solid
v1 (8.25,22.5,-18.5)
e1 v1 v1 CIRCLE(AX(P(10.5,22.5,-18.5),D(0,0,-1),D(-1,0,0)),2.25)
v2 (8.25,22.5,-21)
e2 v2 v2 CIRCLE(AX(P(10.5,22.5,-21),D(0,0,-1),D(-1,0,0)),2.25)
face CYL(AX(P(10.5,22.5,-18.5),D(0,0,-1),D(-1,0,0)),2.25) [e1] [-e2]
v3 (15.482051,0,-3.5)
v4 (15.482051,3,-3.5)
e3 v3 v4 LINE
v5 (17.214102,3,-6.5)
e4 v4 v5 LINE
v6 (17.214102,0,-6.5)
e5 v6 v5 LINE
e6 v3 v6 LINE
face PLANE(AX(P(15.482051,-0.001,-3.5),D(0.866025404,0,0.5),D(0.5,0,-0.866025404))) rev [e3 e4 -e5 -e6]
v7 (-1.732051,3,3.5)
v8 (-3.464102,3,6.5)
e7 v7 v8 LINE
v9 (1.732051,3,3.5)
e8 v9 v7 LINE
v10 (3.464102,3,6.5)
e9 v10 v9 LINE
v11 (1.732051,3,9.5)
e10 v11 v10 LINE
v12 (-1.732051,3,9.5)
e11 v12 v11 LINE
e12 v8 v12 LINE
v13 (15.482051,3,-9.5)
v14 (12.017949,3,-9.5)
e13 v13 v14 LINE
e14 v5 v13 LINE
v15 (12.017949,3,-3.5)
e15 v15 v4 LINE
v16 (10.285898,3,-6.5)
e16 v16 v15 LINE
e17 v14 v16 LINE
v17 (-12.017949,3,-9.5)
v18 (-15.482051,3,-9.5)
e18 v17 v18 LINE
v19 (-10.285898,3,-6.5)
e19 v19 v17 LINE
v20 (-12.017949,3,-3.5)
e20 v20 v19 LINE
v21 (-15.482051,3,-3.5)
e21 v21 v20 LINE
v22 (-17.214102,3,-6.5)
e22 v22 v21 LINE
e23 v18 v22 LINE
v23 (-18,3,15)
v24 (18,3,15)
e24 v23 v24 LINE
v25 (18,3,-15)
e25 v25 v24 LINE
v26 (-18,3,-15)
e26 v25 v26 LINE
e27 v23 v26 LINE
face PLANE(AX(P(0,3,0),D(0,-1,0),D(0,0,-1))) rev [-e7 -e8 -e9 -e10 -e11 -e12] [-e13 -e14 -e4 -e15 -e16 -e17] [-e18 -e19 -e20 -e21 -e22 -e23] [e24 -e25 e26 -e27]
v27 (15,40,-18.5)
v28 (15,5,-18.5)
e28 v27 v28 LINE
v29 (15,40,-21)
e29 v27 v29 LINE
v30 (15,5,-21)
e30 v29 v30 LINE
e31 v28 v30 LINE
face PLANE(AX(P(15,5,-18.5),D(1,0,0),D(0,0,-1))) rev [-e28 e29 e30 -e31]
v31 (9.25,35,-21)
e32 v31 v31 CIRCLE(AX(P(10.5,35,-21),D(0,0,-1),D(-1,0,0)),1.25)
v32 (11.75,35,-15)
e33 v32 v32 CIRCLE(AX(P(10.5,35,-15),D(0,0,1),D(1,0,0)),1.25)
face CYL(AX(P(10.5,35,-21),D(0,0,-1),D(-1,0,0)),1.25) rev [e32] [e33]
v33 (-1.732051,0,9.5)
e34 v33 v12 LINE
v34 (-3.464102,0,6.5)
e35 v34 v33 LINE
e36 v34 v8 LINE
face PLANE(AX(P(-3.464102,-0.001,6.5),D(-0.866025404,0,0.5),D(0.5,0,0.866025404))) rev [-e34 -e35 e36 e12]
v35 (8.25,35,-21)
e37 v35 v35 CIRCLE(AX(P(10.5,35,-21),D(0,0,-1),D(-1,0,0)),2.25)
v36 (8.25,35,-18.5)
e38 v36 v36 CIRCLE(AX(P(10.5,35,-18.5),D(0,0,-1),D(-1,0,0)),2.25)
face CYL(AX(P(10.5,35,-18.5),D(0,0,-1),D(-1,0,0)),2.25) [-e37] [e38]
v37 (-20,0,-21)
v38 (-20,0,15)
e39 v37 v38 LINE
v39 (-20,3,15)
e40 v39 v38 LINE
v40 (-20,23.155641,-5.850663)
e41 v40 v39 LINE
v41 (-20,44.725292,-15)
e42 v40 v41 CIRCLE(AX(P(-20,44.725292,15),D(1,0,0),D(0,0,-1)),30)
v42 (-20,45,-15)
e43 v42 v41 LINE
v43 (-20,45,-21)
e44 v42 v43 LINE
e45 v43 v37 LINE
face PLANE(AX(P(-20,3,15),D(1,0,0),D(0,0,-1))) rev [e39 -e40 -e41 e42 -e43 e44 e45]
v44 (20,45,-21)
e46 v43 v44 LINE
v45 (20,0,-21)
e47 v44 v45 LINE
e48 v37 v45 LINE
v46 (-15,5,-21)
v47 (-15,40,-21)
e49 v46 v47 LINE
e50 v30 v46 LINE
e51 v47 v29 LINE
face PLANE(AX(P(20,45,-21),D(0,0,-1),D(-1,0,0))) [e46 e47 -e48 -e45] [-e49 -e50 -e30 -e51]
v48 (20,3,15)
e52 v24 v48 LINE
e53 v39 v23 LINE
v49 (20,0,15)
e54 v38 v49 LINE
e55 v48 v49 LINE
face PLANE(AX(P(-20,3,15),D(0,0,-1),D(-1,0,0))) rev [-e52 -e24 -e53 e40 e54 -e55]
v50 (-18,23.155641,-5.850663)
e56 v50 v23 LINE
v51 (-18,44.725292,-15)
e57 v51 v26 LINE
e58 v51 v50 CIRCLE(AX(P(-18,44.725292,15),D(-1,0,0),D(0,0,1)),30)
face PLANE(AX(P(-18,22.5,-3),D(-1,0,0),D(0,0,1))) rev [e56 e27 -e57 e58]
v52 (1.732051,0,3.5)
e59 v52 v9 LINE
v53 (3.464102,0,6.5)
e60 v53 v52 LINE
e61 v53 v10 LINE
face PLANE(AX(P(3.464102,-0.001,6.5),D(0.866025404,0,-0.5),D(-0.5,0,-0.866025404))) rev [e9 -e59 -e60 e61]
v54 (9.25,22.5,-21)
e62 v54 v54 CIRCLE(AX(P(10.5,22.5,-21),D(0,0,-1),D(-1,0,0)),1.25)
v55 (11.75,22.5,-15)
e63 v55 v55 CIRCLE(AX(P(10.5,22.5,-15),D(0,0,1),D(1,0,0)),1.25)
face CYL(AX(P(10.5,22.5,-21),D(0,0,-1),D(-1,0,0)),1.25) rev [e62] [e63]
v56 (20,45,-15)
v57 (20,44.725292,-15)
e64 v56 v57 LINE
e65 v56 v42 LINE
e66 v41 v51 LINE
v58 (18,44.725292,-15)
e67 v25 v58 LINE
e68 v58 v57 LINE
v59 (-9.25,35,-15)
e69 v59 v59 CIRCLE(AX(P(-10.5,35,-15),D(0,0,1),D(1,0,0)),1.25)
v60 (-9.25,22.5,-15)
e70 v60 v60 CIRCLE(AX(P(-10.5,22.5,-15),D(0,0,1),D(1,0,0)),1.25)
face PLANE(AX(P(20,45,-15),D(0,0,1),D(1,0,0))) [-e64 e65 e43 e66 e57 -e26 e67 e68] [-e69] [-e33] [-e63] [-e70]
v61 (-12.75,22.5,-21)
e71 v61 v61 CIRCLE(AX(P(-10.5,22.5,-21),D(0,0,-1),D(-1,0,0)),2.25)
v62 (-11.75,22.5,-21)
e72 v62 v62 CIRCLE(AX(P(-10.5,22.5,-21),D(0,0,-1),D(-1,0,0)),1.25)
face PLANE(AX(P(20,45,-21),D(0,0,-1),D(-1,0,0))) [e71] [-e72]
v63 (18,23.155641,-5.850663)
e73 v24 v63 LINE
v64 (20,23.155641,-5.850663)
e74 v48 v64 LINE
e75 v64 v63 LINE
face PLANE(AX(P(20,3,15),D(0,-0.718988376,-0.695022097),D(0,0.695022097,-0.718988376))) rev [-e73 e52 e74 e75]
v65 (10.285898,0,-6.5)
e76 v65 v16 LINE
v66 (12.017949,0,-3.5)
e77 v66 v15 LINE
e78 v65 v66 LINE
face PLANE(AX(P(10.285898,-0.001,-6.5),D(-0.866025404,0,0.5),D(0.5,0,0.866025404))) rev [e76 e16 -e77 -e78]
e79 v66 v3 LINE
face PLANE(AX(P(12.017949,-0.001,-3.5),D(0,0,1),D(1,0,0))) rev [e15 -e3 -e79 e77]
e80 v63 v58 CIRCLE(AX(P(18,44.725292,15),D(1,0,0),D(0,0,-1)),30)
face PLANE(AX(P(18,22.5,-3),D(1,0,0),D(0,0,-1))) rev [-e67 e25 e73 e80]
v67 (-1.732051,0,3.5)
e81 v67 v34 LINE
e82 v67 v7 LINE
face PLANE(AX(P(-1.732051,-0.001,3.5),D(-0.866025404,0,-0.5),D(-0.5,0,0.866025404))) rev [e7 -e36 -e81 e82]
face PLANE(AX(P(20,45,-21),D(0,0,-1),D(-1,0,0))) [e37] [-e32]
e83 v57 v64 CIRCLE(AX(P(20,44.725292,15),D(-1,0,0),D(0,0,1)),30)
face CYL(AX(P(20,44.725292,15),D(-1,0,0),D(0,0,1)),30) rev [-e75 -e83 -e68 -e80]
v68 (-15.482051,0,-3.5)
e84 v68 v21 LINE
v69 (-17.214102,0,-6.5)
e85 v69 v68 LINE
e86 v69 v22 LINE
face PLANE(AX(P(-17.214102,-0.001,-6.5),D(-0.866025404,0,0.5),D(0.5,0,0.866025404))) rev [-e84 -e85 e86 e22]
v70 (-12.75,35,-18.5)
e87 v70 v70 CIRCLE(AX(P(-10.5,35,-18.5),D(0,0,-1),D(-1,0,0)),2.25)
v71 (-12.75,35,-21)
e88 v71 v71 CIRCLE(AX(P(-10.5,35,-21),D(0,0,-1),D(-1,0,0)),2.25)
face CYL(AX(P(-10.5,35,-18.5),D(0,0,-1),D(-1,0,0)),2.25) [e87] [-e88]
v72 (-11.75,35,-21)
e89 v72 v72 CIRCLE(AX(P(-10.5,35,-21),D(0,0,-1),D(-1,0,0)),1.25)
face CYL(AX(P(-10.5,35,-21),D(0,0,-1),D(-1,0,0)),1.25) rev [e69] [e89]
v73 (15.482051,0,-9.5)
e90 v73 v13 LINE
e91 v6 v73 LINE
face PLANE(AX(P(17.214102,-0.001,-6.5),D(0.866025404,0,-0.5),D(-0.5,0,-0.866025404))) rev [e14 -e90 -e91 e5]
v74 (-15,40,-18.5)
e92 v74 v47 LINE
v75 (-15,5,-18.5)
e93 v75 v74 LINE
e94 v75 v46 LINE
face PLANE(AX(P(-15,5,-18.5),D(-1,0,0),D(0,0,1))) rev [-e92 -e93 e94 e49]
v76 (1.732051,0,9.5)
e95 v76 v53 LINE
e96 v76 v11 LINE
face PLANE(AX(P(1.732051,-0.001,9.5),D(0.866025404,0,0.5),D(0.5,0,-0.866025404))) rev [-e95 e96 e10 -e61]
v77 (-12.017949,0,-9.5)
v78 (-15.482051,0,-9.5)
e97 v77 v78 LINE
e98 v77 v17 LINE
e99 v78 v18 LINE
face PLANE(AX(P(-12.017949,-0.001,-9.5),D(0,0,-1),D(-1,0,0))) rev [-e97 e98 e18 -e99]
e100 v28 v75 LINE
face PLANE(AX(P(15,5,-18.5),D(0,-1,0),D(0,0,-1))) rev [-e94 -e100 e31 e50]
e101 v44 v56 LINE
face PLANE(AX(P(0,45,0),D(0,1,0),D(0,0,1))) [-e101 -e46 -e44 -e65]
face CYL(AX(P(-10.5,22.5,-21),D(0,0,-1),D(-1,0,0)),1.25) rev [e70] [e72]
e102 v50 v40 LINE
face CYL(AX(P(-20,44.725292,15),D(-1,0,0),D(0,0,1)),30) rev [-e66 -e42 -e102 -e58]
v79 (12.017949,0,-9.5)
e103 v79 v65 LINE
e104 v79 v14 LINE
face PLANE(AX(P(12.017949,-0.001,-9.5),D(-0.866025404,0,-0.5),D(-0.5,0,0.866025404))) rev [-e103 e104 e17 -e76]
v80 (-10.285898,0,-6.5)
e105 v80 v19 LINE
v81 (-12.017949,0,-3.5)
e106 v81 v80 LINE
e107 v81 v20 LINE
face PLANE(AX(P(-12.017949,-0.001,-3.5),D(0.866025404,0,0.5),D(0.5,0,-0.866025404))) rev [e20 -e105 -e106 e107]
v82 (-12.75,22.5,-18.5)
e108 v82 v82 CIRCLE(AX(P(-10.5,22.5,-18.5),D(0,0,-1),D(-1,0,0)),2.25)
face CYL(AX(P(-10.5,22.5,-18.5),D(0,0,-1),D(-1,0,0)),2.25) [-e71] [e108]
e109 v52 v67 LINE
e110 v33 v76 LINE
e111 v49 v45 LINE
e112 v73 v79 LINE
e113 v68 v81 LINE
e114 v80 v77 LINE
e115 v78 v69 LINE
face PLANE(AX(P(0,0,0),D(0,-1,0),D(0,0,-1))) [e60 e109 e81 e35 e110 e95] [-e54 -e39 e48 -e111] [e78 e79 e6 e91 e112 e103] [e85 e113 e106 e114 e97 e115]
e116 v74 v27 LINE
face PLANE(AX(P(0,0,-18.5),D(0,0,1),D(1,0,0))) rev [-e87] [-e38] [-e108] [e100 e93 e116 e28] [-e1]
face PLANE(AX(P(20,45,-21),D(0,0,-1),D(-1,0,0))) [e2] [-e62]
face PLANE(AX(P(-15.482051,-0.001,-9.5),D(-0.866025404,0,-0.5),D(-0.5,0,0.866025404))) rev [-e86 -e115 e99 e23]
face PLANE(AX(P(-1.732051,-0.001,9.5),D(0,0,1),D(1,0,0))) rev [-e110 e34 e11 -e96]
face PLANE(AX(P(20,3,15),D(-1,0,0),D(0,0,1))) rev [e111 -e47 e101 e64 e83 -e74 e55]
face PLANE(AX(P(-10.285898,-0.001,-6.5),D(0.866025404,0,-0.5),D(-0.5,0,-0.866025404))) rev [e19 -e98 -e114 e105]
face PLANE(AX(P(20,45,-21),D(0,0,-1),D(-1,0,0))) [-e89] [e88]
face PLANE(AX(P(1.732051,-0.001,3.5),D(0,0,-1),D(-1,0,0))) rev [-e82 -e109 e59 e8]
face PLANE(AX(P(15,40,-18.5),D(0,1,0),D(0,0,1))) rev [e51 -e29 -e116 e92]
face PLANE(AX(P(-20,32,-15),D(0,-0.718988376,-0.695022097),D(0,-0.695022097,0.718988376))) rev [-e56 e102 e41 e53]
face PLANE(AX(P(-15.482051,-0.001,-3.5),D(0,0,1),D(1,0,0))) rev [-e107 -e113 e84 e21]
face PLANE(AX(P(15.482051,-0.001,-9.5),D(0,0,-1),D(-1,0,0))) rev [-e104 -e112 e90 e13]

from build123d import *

# Parameters (mm, degrees)
SKETCH1_W             = 40
SKETCH1_H             = 30
BOSS_EXTRUDE1_DEPTH   = 3
CUT_EXTRUDE1_REACH    = 27.179
SKETCH3_W             = 40
SKETCH3_H             = 6
BOSS_EXTRUDE2_DEPTH   = 45
RIB1_REACH            = 65.765
SKETCH5_WALL_W        = 171.255680626
SKETCH5_WALL_H        = 2
RIB2_START            = -2
RIB2_DEPTH            = 2
FILLET1_R             = 30
SKETCH7_W             = 30
SKETCH7_H             = 35
SKETCH7_R             = 2.25
CUT_EXTRUDE2_DEPTH    = 2.5
F_2_5MM_DOWEL_HOLE1_D = 2.5


# Read off the part's stored shape, not the designer's step: Rib2
with BuildPart() as part:
    # Sketch1 → Boss-Extrude1 (new body)
    with BuildSketch(Plane(origin=(0, 0, 0), x_dir=(1, 0, 0), z_dir=(0, 1, 0))):
        Rectangle(SKETCH1_W, SKETCH1_H)
    extrude(amount=BOSS_EXTRUDE1_DEPTH)

    # Sketch2 → Cut-Extrude1 (cut, up to next)
    with BuildSketch(Plane(origin=(0, 3, 0), x_dir=(1, 0, 0), z_dir=(0, 1, 0)), mode=Mode.PRIVATE) as cut_extrude1_sk1:
        Polygon((-10.285898385, 6.5), (-12.017949192, 9.5), (-15.482050808, 9.5), (-17.214101615, 6.5), (-15.482050808, 3.5), (-12.017949192, 3.5), align=None)
    cut_extrude1_tool1 = extrude(cut_extrude1_sk1.sketch, amount=-CUT_EXTRUDE1_REACH, mode=Mode.PRIVATE) & part.part
    # Sketch2 → Cut-Extrude1 (cut, up to next)
    with BuildSketch(Plane(origin=(0, 3, 0), x_dir=(1, 0, 0), z_dir=(0, 1, 0)), mode=Mode.PRIVATE) as cut_extrude1_sk2:
        Polygon((17.214101615, 6.5), (15.482050808, 9.5), (12.017949192, 9.5), (10.285898385, 6.5), (12.017949192, 3.5), (15.482050808, 3.5), align=None)
    cut_extrude1_tool2 = extrude(cut_extrude1_sk2.sketch, amount=-CUT_EXTRUDE1_REACH, mode=Mode.PRIVATE) & part.part
    # Sketch2 → Cut-Extrude1 (cut, up to next)
    with BuildSketch(Plane(origin=(0, 3, 0), x_dir=(1, 0, 0), z_dir=(0, 1, 0)), mode=Mode.PRIVATE) as cut_extrude1_sk3:
        Polygon((-1.732050808, -9.5), (1.732050808, -9.5), (3.464101615, -6.5), (1.732050808, -3.5), (-1.732050808, -3.5), (-3.464101615, -6.5), align=None)
    cut_extrude1_tool3 = extrude(cut_extrude1_sk3.sketch, amount=-CUT_EXTRUDE1_REACH, mode=Mode.PRIVATE) & part.part
    add(cut_extrude1_tool1.solids().sort_by_distance((-13.75, 3, -6.5))[0], mode=Mode.SUBTRACT)
    add(cut_extrude1_tool2.solids().sort_by_distance((13.75, 3, -6.5))[0], mode=Mode.SUBTRACT)
    add(cut_extrude1_tool3.solids().sort_by_distance((0, 3, 6.5))[0], mode=Mode.SUBTRACT)

    # Sketch3 → Boss-Extrude2 (add)
    with BuildSketch(Plane.XZ):
        with Locations((0, -18)):
            Rectangle(SKETCH3_W, SKETCH3_H)
    extrude(amount=-BOSS_EXTRUDE2_DEPTH)

    # Sketch5 wall → Rib1 (add, up to next)
    with BuildSketch(Plane(origin=(-20, 17.5, 0), x_dir=(0, -0.695022096847, 0.718988376049), z_dir=(0, 0.718988376049, 0.695022096847)), mode=Mode.PRIVATE) as rib1_sk1:
        with Locations((0, 1)):
            Rectangle(SKETCH5_WALL_W, SKETCH5_WALL_H)
    rib1_tool1 = extrude(rib1_sk1.sketch, amount=-RIB1_REACH, mode=Mode.PRIVATE) - part.part
    add(rib1_tool1.solids().sort_by_distance((-20, 17.5, 0))[0])

    # Rib2 outline → Rib2 (add)
    with BuildSketch(Plane(origin=(20, 0, 0), x_dir=(0, 0, -1), z_dir=(1, 0, 0)).offset(RIB2_START)):
        Polygon((15, 32), (-15, 3), (15, 3), align=None)
    extrude(amount=RIB2_DEPTH)

    # Fillet1
    fillet1_edges = [part.edges().sort_by_distance(p)[0] for p in [
        (19, 32, -15),
        (-19, 32, -15),
    ]]
    fillet(fillet1_edges, radius=FILLET1_R)

    # Sketch7 → Cut-Extrude2 (cut)
    with BuildSketch(Plane(origin=(0, 0, -21), x_dir=(-1, 0, 0), z_dir=(0, 0, -1))):
        with Locations((0, 22.5)):
            Rectangle(SKETCH7_W, SKETCH7_H)
        with Locations((-10.5, 35)):
            Circle(SKETCH7_R, mode=Mode.SUBTRACT)
        with Locations((10.5, 35)):
            Circle(SKETCH7_R, mode=Mode.SUBTRACT)
        with Locations((10.5, 22.5)):
            Circle(SKETCH7_R, mode=Mode.SUBTRACT)
        with Locations((-10.5, 22.5)):
            Circle(SKETCH7_R, mode=Mode.SUBTRACT)
    extrude(amount=-CUT_EXTRUDE2_DEPTH, mode=Mode.SUBTRACT)

    # Ø2.5mm Dowel Hole1 (through all)
    with Locations(Plane(origin=(0, 0, -21), x_dir=(-1, 0, 0), z_dir=(0, 0, -1))):
        with Locations((10.5, 35), (-10.5, 35), (-10.5, 22.5), (10.5, 22.5)):
            Hole(F_2_5MM_DOWEL_HOLE1_D / 2)


solid = part.part
